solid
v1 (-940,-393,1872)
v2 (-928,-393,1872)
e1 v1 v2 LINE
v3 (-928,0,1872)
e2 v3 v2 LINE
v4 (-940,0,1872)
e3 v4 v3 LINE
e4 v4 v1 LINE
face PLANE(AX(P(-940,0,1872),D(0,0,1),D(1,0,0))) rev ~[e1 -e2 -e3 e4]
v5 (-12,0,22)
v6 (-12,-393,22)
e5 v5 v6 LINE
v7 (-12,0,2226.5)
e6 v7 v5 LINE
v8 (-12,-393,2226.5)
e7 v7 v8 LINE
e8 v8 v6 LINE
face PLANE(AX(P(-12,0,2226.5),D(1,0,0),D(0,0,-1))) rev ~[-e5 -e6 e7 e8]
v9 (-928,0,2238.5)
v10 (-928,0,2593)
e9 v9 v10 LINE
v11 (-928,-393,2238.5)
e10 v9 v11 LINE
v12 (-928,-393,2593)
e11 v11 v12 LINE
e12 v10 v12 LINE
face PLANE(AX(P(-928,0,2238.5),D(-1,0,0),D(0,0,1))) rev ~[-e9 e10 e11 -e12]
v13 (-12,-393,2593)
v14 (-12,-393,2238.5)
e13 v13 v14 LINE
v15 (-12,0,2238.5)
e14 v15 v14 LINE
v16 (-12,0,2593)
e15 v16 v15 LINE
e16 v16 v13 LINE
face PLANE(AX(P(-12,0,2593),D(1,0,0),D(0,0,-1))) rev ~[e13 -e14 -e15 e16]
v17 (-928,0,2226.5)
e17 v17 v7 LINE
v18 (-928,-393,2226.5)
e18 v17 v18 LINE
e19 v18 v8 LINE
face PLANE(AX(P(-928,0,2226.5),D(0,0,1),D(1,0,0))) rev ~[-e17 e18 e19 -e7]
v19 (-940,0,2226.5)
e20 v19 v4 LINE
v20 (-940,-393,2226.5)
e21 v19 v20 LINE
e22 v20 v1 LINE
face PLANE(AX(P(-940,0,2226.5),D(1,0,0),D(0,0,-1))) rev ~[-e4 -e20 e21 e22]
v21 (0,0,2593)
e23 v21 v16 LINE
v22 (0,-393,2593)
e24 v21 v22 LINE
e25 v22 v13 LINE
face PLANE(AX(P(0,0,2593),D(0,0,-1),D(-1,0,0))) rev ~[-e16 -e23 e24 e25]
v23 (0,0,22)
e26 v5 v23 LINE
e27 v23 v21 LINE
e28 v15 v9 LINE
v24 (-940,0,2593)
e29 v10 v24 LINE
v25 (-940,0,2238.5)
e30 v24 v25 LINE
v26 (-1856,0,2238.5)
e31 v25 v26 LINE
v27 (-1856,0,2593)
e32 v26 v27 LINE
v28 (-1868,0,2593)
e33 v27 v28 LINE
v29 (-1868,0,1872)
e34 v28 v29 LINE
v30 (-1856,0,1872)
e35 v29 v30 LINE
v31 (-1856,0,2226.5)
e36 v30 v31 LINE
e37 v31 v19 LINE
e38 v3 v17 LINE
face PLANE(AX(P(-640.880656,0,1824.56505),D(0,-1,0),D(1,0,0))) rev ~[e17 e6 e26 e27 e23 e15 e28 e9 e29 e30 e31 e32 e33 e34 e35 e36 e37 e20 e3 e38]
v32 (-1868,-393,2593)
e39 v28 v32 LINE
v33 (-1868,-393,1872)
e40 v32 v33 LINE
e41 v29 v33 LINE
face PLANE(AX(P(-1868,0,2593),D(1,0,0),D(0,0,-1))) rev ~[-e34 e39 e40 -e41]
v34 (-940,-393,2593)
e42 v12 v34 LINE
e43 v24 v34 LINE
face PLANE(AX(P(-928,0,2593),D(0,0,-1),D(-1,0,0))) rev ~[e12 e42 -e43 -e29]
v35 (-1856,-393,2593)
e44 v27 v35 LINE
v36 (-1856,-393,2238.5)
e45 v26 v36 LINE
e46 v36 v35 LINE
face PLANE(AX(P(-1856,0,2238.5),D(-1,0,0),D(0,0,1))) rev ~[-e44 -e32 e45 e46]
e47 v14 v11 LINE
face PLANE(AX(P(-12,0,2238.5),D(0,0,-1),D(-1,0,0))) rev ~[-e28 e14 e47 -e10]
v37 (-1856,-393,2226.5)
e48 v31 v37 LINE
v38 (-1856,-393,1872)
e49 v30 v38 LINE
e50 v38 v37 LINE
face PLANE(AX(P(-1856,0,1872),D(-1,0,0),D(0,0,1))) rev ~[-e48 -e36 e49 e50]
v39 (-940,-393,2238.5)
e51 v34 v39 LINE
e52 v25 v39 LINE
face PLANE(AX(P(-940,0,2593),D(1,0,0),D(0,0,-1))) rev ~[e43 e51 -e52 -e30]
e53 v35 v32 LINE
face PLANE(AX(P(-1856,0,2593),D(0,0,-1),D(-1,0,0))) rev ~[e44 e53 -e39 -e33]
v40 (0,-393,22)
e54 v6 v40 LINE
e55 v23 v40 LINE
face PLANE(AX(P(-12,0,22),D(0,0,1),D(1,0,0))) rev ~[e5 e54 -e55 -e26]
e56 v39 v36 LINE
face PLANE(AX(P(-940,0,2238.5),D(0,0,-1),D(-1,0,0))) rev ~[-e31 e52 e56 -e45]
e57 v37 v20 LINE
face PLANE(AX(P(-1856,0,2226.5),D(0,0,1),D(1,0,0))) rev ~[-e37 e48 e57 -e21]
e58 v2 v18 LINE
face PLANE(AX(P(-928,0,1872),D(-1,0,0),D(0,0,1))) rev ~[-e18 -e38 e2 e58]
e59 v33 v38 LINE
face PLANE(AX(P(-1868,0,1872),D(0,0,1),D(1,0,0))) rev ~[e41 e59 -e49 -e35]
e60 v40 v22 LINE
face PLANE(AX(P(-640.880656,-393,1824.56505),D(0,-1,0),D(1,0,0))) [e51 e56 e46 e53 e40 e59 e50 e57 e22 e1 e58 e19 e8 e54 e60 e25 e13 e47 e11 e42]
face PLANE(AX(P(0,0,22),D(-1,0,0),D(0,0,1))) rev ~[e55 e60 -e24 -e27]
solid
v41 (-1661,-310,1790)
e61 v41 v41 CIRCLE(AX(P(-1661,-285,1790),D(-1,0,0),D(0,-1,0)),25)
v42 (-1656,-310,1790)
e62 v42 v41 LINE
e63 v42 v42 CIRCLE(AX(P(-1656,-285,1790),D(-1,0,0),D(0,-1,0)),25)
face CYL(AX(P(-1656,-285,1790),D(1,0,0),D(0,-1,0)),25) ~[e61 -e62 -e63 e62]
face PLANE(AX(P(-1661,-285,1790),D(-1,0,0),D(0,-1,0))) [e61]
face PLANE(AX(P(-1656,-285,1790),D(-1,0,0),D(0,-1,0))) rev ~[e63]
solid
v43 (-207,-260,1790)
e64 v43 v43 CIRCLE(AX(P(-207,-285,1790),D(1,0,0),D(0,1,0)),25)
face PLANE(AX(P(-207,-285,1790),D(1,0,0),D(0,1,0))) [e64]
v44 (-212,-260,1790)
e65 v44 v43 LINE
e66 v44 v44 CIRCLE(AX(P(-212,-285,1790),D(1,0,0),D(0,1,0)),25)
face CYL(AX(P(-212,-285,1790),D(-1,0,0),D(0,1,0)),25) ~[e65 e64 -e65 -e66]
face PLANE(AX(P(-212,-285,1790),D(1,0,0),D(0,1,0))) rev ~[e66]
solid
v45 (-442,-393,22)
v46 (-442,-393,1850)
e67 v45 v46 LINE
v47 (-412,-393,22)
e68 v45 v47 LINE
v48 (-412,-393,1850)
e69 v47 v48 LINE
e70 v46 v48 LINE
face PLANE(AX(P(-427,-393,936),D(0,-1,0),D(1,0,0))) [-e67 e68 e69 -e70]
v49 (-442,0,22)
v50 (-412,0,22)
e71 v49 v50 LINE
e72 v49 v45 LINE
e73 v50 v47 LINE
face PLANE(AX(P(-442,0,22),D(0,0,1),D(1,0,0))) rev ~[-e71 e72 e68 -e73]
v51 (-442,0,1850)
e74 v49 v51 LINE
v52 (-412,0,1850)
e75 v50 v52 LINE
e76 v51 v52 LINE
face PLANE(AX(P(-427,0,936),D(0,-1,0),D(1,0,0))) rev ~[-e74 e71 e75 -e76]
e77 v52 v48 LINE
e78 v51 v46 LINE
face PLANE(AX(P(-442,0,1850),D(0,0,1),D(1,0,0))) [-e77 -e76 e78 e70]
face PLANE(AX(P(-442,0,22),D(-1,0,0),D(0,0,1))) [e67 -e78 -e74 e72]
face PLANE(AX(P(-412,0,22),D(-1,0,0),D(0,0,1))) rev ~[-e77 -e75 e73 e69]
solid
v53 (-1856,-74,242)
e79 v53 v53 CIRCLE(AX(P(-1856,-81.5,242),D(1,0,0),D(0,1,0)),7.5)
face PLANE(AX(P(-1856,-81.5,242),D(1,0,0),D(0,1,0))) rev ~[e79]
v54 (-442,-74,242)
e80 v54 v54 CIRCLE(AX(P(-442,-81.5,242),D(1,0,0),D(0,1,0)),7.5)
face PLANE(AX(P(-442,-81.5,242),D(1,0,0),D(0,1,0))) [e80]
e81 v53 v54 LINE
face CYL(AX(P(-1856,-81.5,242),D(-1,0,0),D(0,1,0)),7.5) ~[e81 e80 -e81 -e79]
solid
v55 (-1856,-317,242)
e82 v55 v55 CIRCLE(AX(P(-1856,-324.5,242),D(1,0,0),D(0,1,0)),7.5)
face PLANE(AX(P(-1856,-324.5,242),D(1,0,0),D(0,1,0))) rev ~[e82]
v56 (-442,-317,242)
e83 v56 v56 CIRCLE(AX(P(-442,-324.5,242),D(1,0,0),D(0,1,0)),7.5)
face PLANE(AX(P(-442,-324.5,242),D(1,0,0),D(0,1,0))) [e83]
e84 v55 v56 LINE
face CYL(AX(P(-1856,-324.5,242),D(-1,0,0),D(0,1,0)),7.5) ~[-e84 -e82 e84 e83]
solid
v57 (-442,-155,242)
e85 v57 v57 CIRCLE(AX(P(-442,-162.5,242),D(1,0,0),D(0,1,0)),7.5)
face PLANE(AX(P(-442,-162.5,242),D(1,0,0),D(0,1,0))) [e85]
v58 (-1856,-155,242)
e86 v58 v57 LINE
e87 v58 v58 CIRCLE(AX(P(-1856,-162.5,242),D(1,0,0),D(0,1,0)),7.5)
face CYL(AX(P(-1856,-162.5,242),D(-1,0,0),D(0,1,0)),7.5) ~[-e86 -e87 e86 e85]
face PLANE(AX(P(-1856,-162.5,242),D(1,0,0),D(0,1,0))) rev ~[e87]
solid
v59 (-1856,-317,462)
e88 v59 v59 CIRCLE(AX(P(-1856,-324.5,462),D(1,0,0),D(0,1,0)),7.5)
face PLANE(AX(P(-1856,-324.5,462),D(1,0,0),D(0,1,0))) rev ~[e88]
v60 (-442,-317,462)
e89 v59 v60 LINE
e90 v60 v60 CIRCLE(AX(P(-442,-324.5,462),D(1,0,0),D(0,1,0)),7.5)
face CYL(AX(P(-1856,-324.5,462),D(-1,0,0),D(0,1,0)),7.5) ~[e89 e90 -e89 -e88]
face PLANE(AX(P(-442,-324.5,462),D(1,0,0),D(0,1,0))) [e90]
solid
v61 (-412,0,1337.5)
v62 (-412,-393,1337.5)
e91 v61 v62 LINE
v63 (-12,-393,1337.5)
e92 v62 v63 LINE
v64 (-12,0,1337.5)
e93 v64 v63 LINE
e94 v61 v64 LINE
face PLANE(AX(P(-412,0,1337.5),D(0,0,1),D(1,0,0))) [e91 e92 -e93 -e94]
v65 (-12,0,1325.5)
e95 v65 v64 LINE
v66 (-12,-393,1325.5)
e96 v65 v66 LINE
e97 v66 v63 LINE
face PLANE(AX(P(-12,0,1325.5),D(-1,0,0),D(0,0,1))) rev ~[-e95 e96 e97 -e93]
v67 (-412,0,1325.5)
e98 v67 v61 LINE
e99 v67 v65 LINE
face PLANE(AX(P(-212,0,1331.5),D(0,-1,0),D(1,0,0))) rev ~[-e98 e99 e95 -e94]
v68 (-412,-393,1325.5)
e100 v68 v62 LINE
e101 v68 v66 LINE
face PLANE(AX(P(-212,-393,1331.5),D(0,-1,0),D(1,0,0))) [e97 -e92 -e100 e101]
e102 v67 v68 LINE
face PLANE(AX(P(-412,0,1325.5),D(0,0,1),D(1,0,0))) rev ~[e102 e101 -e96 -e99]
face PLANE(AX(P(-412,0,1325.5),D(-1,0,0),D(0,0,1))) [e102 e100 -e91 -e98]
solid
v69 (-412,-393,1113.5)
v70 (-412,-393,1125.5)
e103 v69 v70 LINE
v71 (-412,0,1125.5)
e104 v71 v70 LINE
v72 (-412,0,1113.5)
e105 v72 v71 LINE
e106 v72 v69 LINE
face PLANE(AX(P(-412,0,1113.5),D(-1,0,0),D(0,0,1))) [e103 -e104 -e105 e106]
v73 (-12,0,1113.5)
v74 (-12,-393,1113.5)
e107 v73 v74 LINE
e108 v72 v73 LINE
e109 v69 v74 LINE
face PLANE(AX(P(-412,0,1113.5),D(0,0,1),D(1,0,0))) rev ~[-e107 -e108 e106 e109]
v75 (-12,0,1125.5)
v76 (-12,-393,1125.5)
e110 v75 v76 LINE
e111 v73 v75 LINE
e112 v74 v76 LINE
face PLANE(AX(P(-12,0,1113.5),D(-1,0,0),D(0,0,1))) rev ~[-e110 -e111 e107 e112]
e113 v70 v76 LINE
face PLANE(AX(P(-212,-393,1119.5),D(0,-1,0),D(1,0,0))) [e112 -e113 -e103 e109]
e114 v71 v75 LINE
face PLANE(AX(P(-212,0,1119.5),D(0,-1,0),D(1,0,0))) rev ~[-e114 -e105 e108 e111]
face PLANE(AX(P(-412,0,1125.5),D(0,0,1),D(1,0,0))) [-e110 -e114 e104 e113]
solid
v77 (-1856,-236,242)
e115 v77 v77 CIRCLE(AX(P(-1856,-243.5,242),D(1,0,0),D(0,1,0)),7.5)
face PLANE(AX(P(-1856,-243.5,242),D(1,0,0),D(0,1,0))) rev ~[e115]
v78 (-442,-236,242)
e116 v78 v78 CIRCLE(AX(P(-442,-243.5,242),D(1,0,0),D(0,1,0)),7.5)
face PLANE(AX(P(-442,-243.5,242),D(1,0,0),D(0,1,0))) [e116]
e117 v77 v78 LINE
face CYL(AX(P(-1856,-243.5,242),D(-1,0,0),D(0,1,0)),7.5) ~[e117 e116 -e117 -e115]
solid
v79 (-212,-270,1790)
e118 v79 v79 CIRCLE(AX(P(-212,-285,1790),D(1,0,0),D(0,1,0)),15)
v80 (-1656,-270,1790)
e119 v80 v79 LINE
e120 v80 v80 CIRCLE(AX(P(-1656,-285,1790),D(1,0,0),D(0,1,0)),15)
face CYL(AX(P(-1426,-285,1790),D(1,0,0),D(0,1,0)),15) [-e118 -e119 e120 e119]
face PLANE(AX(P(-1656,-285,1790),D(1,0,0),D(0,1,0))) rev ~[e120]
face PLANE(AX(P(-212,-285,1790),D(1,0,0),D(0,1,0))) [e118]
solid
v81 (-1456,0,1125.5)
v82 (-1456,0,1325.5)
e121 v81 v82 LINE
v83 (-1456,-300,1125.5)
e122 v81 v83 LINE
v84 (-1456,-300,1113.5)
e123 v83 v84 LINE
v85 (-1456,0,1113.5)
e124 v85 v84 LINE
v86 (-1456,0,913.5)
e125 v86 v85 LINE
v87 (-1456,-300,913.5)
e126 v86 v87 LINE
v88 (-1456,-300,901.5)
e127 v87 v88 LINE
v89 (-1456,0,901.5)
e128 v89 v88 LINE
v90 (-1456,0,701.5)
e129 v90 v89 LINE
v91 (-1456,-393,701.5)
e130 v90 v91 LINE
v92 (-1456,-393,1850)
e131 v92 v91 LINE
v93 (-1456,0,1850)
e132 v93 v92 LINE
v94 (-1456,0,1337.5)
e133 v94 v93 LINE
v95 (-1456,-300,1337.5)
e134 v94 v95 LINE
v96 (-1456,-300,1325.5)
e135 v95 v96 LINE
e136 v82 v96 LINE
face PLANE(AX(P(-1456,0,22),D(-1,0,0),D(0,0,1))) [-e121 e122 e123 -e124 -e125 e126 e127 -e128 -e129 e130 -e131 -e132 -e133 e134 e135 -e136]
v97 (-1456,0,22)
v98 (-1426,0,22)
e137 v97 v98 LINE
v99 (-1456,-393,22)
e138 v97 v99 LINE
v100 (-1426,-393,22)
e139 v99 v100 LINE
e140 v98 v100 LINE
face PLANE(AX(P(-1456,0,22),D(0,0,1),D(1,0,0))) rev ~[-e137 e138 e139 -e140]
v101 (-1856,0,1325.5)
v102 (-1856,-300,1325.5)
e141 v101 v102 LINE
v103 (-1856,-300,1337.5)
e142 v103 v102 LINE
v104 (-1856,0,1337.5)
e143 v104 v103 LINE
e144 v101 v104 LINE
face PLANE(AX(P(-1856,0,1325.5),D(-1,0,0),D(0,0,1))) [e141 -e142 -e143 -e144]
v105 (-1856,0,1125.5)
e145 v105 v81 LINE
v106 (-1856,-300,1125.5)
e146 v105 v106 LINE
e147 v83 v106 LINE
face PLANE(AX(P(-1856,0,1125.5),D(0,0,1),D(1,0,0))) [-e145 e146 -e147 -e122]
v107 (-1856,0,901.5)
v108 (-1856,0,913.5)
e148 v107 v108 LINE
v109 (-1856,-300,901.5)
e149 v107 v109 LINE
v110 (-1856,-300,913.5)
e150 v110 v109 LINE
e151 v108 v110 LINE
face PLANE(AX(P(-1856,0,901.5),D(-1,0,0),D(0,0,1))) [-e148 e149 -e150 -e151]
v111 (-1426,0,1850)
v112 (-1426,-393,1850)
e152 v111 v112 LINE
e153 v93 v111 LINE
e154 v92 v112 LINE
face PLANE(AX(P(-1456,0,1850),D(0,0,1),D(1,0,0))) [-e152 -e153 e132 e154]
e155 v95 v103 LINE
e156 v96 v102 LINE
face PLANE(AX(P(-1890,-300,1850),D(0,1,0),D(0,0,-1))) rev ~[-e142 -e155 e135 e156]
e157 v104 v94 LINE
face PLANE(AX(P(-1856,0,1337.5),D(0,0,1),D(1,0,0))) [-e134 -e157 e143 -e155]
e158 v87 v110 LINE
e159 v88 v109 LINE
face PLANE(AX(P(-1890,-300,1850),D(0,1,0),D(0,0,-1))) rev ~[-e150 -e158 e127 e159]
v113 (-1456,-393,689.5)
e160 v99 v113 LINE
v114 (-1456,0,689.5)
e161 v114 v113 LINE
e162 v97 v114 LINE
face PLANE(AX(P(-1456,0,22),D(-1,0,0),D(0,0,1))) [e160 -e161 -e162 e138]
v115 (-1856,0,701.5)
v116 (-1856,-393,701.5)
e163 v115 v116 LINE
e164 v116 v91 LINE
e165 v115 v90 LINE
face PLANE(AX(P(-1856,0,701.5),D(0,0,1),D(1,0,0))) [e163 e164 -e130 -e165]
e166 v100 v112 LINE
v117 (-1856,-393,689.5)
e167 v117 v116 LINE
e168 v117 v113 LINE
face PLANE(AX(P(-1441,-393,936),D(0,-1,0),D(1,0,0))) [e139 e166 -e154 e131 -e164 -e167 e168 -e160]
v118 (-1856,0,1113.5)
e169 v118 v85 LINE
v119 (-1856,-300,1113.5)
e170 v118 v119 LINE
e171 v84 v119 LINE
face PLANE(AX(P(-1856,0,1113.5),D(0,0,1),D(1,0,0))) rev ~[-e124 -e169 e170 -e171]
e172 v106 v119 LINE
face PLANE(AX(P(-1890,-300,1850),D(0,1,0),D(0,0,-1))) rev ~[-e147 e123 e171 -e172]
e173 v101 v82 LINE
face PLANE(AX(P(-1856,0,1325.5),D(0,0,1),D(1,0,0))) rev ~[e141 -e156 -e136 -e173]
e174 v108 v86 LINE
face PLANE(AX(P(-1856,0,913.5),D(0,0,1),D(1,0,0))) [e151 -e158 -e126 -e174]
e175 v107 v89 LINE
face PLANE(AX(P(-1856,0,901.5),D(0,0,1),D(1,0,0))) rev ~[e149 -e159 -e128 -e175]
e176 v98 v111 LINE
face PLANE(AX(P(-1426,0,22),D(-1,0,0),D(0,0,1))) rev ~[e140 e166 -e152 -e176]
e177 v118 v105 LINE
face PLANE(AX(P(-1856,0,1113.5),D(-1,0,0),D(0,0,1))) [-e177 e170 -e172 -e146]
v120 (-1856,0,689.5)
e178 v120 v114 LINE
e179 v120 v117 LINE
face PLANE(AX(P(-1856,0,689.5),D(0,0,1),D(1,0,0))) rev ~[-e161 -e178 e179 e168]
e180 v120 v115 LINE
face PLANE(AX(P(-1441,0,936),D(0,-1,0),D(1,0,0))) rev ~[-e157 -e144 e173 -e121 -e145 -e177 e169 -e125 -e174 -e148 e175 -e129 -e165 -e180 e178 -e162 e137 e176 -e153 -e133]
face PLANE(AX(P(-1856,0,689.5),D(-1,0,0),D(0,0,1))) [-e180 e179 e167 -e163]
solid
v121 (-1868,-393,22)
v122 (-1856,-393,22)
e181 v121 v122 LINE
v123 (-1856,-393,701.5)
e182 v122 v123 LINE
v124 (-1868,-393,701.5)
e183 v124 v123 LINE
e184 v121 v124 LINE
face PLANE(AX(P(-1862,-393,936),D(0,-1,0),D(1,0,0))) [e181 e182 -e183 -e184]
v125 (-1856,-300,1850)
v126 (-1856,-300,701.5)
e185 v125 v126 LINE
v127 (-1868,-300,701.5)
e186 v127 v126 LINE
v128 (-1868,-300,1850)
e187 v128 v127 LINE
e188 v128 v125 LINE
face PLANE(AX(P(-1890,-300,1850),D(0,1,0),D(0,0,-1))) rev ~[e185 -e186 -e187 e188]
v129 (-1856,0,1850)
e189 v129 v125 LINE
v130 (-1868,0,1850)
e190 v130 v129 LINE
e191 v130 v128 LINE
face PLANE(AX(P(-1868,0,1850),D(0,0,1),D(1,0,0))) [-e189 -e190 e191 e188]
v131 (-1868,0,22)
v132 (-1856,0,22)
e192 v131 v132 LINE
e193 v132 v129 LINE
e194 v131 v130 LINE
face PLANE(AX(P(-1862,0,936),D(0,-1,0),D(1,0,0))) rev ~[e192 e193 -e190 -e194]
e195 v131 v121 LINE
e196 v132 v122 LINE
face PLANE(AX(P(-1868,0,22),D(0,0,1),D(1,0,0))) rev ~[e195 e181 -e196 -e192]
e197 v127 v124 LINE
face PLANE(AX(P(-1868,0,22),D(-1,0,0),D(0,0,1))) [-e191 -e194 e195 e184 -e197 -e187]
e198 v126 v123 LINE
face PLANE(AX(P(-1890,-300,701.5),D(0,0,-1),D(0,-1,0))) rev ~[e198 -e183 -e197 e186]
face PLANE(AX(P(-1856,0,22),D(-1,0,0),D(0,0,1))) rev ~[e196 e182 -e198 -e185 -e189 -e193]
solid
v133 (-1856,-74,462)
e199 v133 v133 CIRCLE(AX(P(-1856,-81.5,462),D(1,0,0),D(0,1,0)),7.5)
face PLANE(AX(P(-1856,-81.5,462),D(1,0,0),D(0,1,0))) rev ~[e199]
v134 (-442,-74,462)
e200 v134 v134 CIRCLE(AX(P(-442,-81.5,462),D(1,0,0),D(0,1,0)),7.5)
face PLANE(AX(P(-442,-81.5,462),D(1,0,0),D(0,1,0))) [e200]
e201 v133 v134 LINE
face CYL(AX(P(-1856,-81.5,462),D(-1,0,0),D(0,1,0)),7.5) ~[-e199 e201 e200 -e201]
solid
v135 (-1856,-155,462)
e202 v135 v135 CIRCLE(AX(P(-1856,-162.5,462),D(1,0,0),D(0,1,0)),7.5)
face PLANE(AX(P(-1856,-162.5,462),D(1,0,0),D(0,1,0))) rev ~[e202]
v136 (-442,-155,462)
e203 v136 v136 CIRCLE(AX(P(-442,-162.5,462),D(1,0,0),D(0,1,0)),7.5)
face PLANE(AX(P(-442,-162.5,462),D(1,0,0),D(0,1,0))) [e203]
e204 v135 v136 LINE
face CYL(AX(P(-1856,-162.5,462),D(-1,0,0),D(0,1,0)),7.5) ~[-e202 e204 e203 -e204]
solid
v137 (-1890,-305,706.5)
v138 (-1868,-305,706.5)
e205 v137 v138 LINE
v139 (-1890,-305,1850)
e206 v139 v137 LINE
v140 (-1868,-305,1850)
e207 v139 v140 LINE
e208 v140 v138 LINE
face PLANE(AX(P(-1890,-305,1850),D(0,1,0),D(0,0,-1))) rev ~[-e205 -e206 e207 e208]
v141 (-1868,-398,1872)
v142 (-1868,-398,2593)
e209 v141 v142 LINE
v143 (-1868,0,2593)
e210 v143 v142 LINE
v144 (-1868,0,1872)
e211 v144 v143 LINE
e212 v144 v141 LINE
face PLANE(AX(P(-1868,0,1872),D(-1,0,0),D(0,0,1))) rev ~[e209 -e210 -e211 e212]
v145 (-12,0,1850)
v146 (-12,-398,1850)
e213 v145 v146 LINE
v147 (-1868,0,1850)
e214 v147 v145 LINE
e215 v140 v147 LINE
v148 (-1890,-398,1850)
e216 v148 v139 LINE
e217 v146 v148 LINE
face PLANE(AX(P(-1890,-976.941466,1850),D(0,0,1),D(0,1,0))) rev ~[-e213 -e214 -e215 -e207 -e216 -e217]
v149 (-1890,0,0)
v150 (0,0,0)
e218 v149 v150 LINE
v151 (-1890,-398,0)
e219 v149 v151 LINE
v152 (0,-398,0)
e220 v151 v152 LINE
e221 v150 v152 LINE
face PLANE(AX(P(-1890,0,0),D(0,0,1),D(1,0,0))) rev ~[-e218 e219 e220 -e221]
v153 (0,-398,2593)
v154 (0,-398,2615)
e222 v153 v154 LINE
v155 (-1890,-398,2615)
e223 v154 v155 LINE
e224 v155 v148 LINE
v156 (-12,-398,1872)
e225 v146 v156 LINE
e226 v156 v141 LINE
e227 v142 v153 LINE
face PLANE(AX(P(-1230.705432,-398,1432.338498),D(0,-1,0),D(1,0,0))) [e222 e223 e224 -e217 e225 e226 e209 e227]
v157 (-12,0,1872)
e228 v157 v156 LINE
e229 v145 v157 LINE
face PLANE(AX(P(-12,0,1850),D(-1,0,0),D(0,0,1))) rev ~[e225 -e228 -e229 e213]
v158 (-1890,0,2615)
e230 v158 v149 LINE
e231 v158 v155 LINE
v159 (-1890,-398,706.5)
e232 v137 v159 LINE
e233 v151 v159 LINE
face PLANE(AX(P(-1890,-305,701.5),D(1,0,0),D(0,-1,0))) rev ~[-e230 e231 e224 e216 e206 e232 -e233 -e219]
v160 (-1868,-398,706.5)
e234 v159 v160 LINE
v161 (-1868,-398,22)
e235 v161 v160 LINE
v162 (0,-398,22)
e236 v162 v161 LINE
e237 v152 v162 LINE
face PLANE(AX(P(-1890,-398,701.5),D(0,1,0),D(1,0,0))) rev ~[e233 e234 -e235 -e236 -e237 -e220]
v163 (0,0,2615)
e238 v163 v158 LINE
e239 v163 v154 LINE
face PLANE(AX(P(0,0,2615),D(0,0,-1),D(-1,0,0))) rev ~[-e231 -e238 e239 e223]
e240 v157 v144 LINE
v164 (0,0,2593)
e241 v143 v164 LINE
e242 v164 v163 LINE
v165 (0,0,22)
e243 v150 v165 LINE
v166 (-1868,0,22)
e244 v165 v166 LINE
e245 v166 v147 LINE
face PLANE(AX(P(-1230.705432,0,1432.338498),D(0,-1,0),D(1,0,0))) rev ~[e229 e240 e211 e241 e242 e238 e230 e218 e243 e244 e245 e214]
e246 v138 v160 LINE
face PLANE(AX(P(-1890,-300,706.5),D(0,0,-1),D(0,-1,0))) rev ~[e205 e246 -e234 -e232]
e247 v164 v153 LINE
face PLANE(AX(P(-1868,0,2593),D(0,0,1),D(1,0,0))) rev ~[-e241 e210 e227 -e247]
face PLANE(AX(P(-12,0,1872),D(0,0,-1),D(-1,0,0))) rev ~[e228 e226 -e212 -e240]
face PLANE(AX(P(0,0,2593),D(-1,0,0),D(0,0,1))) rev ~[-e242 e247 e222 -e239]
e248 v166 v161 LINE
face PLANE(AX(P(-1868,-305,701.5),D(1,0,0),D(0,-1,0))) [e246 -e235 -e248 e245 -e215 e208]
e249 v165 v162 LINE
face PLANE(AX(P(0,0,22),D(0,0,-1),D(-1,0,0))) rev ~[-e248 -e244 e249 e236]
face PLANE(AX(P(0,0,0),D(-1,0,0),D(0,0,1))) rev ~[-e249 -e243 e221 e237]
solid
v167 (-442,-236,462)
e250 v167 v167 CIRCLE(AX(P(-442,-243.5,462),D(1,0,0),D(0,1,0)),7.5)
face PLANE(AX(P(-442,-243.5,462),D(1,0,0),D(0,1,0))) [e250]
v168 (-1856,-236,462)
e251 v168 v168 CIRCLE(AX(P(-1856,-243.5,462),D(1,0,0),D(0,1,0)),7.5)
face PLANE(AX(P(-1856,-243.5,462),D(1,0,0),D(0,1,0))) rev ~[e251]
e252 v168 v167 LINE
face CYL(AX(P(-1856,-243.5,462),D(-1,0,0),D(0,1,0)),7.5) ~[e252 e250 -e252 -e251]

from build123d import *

# Parameters (mm, degrees)
F1_DEPTH       = 398
F0_W           = 30
F0_H           = 1828
F2_DEPTH       = 393
F0_W_2         = 12
F3_R           = 7.5
F4_DEPTH       = 1414
F5_W           = 400
F5_H           = 12
F6_DEPTH       = 393
F8_DEPTH       = 434
F9_DEPTH       = 5
F10_DEPTH      = 5
F11_R          = 15
F12_DEPTH      = 1214
F12_DEPTH_BACK = 230
F13_R          = 25
F13_R_2        = 15
F14_DEPTH      = 5
F15_R          = 25
F15_R_2        = 15
F16_DEPTH      = 5


with BuildPart() as f1:
    # F0 (on Front) → F1 (new body)
    with BuildSketch(Plane.XZ):
        Polygon((-1890, 0), (0, 0), (0, 22), (-12, 22), (-412, 22), (-442, 22), (-1426, 22), (-1456, 22), (-1856, 22), (-1868, 22), (-1868, 1850), (-1856, 1850), (-1456, 1850), (-1426, 1850), (-442, 1850), (-412, 1850), (-12, 1850), (-12, 1872), (-928, 1872), (-940, 1872), (-1856, 1872), (-1868, 1872), (-1868, 2593), (-1856, 2593), (-940, 2593), (-928, 2593), (-12, 2593), (0, 2593), (0, 2615), (-1890, 2615), align=None)
    extrude(amount=F1_DEPTH)


with BuildPart() as f2:
    # F0 (on Front) → F2 (new body, through all)
    with BuildSketch(Plane.XZ):
        with Locations((-1441, 936)):
            Rectangle(F0_W, F0_H)
    extrude(amount=F2_DEPTH)

    # F5 (on Front) → F6 (join, through all)
    with BuildSketch(Plane.XZ):
        with Locations((-1656, 1331.5)):
            Rectangle(F5_W, F5_H)
        with Locations((-1656, 1119.5)):
            Rectangle(F5_W, F5_H)
        with Locations((-1656, 907.5)):
            Rectangle(F5_W, F5_H)
        with Locations((-1656, 695.5)):
            Rectangle(F5_W, F5_H)
    extrude(amount=F6_DEPTH)


with BuildPart() as f2b:
    # F0 (on Front) → F2, piece 2 (new body, through all)
    with BuildSketch(Plane.XZ):
        with Locations((-427, 936)):
            Rectangle(F0_W, F0_H)
    extrude(amount=F2_DEPTH)


with BuildPart() as f2c:
    # F0 (on Front) → F2, piece 3 (new body, through all)
    with BuildSketch(Plane.XZ):
        Polygon((-12, 22), (0, 22), (0, 2593), (-12, 2593), (-12, 2238.5), (-928, 2238.5), (-928, 2593), (-940, 2593), (-940, 2238.5), (-1856, 2238.5), (-1856, 2593), (-1868, 2593), (-1868, 1872), (-1856, 1872), (-1856, 2226.5), (-940, 2226.5), (-940, 1872), (-928, 1872), (-928, 2226.5), (-12, 2226.5), (-12, 1872), (-12, 1850), align=None)
    extrude(amount=F2_DEPTH)


with BuildPart() as f2d:
    # F0 (on Front) → F2, piece 4 (new body, through all)
    with BuildSketch(Plane.XZ):
        with Locations((-1862, 936)):
            Rectangle(F0_W_2, F0_H)
    extrude(amount=F2_DEPTH)


with BuildPart() as f4:
    # F3 (on face) → F4 (new body, through all)
    with BuildSketch(Plane.YZ.offset(-1856)):
        with Locations((-324.5, 242)):
            Circle(F3_R)
    extrude(amount=F4_DEPTH)


with BuildPart() as f4b:
    # F3 (on face) → F4, piece 2 (new body, through all)
    with BuildSketch(Plane.YZ.offset(-1856)):
        with Locations((-324.5, 462)):
            Circle(F3_R)
    extrude(amount=F4_DEPTH)


with BuildPart() as f4c:
    # F3 (on face) → F4, piece 3 (new body, through all)
    with BuildSketch(Plane.YZ.offset(-1856)):
        with Locations((-243.5, 242)):
            Circle(F3_R)
    extrude(amount=F4_DEPTH)


with BuildPart() as f4d:
    # F3 (on face) → F4, piece 4 (new body, through all)
    with BuildSketch(Plane.YZ.offset(-1856)):
        with Locations((-243.5, 462)):
            Circle(F3_R)
    extrude(amount=F4_DEPTH)


with BuildPart() as f4e:
    # F3 (on face) → F4, piece 5 (new body, through all)
    with BuildSketch(Plane.YZ.offset(-1856)):
        with Locations((-162.5, 242)):
            Circle(F3_R)
    extrude(amount=F4_DEPTH)


with BuildPart() as f4f:
    # F3 (on face) → F4, piece 6 (new body, through all)
    with BuildSketch(Plane.YZ.offset(-1856)):
        with Locations((-162.5, 462)):
            Circle(F3_R)
    extrude(amount=F4_DEPTH)


with BuildPart() as f4g:
    # F3 (on face) → F4, piece 7 (new body, through all)
    with BuildSketch(Plane.YZ.offset(-1856)):
        with Locations((-81.5, 242)):
            Circle(F3_R)
    extrude(amount=F4_DEPTH)


with BuildPart() as f4h:
    # F3 (on face) → F4, piece 8 (new body, through all)
    with BuildSketch(Plane.YZ.offset(-1856)):
        with Locations((-81.5, 462)):
            Circle(F3_R)
    extrude(amount=F4_DEPTH)


with BuildPart() as f6:
    # F5 (on Front) → F6, piece 2 (new body, through all)
    with BuildSketch(Plane.XZ):
        with Locations((-212, 1331.5)):
            Rectangle(F5_W, F5_H)
    extrude(amount=F6_DEPTH)


with BuildPart() as f6b:
    # F5 (on Front) → F6, piece 3 (new body, through all)
    with BuildSketch(Plane.XZ):
        with Locations((-212, 1119.5)):
            Rectangle(F5_W, F5_H)
    extrude(amount=F6_DEPTH)


with BuildPart() as f8_tool:
    # F7 (on face) → F8 (new body, through all)
    with BuildSketch(Plane(origin=(-1890, 0, 0), x_dir=(0, -1, 0), z_dir=(-1, 0, 0))):
        Polygon((964.3889665604, 701.5), (976.9414663315, 1850), (300, 1850), (300, 701.5), align=None)
    extrude(amount=-F8_DEPTH)


with BuildPart() as f1_1:
    add(f1.part)

    # F8: cut by f8_tool
    add(f8_tool.part, mode=Mode.SUBTRACT)

    # F9 (add): a face of the model
    f9_faces = [f1_1.faces().sort_by_distance(p)[0] for p in [
        (-1879, -300, 1275.75),
    ]]
    extrude(f9_faces, amount=F9_DEPTH)

    # F10 (add): a face of the model
    f10_faces = [f1_1.faces().sort_by_distance(p)[0] for p in [
        (-1879, -351.5, 701.5),
    ]]
    extrude(f10_faces, amount=F10_DEPTH)


with BuildPart() as f2_1:
    add(f2.part)

    # F8: cut by f8_tool
    add(f8_tool.part, mode=Mode.SUBTRACT)


with BuildPart() as f2d_1:
    add(f2d.part)

    # F8: cut by f8_tool
    add(f8_tool.part, mode=Mode.SUBTRACT)


with BuildPart() as f12:
    # F11 (on face) → F12 (new body, two sides)
    with BuildSketch(Plane.YZ.offset(-1426)) as f12_sk:
        with Locations((-285, 1790)):
            Circle(F11_R)
    extrude(amount=F12_DEPTH)
    extrude(f12_sk.sketch, amount=-F12_DEPTH_BACK)


with BuildPart() as f14:
    # F13 (on face) → F14 (new body)
    with BuildSketch(Plane(origin=(-1656, 0, 0), x_dir=(0, -1, 0), z_dir=(-1, 0, 0))):
        with Locations((285, 1790)):
            Circle(F13_R)
        with Locations((285, 1790)):
            Circle(F13_R_2, mode=Mode.SUBTRACT)
        with Locations((285, 1790)):
            Circle(F13_R_2)
    extrude(amount=F14_DEPTH)


with BuildPart() as f16:
    # F15 (on face) → F16 (new body)
    with BuildSketch(Plane.YZ.offset(-212)):
        with Locations((-285, 1790)):
            Circle(F15_R)
        with Locations((-285, 1790)):
            Circle(F15_R_2, mode=Mode.SUBTRACT)
        with Locations((-285, 1790)):
            Circle(F15_R_2)
    extrude(amount=F16_DEPTH)


solid = Compound([f2b.part, f2c.part, f4.part, f4b.part, f4c.part, f4d.part, f4e.part, f4f.part, f4g.part, f4h.part, f6.part, f6b.part, f1_1.part, f2_1.part, f2d_1.part, f12.part, f14.part, f16.part])
